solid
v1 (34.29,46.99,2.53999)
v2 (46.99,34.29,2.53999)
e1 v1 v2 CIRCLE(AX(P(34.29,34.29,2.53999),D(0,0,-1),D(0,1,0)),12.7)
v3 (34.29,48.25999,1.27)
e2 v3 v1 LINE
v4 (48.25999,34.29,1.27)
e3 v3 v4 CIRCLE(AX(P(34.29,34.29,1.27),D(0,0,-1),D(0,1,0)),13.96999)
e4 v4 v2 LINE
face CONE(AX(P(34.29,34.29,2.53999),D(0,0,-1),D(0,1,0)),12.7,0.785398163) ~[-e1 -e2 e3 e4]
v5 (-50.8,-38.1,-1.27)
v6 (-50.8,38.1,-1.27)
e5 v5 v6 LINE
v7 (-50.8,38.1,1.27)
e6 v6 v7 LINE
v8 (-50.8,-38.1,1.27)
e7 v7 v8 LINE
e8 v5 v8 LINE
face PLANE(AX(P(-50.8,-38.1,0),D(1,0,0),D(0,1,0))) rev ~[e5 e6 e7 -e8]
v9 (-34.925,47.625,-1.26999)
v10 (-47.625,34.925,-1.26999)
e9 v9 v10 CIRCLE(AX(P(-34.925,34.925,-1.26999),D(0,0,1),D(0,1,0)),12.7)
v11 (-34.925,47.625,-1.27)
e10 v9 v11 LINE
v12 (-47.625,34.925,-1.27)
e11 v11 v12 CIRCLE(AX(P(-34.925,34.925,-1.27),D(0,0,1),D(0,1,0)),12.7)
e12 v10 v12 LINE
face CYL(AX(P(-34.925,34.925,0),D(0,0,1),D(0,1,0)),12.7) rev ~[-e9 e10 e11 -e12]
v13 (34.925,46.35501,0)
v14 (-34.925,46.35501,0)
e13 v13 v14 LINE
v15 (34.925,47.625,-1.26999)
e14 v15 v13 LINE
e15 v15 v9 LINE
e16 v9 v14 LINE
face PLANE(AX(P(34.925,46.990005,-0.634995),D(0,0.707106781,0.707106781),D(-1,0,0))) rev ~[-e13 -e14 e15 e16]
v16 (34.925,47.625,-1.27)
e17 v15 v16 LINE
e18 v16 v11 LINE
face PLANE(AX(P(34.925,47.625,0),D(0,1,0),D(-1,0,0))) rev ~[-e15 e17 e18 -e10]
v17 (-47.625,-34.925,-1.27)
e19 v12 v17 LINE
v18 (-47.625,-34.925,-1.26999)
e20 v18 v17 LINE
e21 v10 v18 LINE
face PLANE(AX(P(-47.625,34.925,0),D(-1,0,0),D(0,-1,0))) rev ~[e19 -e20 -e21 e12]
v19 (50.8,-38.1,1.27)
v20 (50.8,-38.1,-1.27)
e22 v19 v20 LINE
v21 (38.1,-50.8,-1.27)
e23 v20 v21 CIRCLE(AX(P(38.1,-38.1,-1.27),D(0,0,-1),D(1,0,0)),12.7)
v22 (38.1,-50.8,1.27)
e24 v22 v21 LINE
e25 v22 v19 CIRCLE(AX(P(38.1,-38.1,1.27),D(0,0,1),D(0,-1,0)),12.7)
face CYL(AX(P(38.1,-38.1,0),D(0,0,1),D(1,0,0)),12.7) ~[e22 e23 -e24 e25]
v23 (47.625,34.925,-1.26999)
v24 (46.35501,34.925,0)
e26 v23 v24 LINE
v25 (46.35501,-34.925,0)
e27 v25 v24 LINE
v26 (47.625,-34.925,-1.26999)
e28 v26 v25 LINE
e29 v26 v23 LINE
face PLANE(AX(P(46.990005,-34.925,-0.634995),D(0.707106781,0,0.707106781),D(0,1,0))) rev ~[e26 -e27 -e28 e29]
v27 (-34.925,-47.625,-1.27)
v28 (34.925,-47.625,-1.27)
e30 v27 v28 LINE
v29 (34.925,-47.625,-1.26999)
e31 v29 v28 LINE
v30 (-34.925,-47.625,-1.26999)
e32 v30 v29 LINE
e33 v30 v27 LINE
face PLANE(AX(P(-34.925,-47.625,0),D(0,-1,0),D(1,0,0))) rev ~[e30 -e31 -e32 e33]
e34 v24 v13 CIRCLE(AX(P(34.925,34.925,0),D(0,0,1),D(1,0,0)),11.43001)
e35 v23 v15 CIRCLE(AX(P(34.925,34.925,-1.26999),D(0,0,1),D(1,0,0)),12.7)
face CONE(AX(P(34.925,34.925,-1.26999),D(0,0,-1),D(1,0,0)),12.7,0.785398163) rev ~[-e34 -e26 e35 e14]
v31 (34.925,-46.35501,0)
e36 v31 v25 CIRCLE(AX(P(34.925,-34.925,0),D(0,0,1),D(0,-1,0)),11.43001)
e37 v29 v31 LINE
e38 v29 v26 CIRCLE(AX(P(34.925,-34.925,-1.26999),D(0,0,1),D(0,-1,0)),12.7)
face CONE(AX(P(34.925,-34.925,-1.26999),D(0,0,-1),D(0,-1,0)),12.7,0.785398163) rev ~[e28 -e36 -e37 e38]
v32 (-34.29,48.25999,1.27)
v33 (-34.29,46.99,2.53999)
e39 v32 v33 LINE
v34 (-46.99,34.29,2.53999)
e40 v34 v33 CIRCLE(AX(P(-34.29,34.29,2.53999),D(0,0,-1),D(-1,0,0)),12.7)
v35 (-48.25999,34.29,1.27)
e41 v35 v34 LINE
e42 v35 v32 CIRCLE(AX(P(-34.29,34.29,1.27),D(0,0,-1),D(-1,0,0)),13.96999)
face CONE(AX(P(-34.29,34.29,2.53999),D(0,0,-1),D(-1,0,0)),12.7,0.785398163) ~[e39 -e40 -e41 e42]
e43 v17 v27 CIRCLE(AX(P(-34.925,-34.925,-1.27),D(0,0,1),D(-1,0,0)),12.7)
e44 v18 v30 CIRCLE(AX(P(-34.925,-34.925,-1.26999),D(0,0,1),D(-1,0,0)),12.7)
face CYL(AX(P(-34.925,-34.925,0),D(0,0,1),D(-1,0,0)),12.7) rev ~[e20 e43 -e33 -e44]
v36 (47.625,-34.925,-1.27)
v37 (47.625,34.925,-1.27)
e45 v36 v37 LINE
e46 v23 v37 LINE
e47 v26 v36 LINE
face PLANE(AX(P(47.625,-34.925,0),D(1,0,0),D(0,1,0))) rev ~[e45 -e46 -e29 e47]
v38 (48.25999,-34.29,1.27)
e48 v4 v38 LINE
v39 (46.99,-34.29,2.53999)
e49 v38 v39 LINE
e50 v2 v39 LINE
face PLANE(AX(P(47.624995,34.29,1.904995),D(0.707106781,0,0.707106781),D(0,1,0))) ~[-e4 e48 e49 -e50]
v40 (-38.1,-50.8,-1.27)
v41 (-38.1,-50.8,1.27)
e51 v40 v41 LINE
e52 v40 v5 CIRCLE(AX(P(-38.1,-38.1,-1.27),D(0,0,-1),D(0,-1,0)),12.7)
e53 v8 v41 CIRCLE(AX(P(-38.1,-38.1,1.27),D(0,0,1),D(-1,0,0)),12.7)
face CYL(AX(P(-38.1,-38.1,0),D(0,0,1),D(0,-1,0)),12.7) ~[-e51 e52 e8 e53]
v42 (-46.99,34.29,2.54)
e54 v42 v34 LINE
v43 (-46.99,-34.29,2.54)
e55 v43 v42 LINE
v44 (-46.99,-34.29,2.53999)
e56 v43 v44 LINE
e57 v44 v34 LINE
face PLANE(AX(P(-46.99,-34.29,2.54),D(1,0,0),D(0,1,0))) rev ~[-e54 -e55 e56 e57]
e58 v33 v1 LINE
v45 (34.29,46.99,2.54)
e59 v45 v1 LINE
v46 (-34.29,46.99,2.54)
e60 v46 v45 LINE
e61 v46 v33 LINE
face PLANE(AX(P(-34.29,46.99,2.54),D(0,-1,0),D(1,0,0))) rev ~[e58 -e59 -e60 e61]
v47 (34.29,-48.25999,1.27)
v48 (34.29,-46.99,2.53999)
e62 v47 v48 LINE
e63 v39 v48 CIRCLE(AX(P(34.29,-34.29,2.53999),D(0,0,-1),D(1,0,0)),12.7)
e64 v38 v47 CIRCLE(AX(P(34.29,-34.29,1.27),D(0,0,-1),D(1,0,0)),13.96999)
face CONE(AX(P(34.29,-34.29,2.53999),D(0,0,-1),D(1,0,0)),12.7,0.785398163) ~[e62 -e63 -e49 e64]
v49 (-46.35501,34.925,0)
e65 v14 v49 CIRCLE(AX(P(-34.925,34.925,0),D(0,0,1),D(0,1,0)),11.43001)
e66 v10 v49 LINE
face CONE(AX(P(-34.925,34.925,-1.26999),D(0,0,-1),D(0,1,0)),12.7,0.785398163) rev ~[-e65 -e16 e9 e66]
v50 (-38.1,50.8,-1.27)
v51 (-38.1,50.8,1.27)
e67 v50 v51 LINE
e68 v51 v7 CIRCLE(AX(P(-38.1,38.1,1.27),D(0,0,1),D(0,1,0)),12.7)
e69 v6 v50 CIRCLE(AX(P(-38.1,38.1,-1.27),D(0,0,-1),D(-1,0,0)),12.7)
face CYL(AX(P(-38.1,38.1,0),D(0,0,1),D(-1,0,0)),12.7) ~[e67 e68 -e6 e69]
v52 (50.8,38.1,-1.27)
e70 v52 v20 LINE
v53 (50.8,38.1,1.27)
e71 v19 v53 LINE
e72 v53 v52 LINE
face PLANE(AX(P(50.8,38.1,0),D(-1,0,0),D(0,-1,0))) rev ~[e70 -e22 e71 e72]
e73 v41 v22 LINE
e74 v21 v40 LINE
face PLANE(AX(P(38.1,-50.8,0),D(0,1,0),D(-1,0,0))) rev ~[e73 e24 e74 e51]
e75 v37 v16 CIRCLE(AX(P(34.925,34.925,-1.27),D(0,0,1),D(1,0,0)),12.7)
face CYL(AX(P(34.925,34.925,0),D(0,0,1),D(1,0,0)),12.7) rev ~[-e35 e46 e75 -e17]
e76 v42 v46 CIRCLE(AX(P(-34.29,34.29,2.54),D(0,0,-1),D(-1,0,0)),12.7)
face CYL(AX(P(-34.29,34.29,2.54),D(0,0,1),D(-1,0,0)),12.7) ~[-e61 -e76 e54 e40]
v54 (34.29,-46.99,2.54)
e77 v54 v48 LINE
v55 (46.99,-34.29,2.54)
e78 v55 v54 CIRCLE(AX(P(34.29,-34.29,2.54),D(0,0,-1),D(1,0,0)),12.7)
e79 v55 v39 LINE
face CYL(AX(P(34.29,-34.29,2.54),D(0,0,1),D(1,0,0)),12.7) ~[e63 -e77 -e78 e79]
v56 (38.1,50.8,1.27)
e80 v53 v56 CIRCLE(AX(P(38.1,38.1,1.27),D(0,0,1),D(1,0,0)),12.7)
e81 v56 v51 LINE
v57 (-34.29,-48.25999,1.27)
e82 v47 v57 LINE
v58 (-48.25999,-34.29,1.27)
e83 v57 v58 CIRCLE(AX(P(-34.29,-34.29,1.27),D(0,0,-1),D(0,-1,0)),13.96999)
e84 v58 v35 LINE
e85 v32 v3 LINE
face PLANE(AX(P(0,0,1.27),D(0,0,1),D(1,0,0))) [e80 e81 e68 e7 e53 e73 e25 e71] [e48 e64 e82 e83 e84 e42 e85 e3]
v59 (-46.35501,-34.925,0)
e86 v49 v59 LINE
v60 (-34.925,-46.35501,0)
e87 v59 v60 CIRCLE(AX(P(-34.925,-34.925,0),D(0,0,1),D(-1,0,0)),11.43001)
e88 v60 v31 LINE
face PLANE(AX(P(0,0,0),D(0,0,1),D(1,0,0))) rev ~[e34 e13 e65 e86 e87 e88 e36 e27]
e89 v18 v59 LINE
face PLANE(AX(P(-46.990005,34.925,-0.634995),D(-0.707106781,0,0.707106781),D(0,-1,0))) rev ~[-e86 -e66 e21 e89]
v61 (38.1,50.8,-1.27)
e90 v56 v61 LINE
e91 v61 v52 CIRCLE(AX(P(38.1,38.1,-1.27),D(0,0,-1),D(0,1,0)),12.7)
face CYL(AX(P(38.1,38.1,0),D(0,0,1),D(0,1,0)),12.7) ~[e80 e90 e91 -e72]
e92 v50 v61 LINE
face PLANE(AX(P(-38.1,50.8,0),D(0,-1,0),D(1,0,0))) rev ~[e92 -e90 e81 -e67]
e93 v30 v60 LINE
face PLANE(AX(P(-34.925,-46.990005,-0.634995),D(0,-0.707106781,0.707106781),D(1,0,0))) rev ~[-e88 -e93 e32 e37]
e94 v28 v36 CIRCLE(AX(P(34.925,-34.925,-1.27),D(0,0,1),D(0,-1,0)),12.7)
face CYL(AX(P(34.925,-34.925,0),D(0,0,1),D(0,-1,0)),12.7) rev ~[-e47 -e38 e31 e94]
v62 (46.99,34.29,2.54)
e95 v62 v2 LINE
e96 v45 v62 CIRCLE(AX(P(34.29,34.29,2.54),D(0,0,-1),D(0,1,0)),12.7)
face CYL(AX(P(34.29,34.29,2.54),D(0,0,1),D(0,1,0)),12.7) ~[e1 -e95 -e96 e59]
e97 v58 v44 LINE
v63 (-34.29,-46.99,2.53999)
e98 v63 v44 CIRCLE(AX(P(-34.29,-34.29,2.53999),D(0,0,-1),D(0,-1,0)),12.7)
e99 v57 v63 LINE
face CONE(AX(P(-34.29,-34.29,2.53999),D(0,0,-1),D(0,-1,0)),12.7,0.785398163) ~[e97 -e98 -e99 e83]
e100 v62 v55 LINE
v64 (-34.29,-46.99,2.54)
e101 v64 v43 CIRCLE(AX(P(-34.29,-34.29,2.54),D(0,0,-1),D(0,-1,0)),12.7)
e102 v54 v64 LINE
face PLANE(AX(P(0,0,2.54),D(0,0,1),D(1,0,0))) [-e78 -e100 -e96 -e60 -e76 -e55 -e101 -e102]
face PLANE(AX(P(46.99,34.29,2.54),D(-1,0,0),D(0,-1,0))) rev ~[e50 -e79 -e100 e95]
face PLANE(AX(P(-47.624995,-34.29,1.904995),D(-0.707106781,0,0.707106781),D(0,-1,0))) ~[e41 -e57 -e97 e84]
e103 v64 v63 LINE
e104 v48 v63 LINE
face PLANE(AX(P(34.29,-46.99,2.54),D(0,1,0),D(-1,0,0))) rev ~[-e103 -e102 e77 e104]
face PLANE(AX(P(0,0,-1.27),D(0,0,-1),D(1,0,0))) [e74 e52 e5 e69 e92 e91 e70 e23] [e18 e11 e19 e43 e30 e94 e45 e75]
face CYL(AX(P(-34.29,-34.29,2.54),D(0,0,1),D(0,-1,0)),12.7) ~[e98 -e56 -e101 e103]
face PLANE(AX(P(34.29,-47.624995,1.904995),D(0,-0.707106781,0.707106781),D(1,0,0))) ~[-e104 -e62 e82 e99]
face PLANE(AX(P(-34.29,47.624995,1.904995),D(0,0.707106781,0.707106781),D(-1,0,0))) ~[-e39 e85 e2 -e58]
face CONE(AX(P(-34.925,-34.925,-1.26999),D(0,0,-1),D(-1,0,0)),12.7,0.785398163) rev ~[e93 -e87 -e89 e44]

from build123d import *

# Parameters (mm, degrees)
F1_DEPTH = 2.54
F3_DEPTH = 1.27
F5_DEPTH = 1.27
F6_SIZE  = 1.26999
F7_SIZE  = 1.26999


# Not quite as in the source:
# - a fillet or chamfer is up to 0.001 mm smaller than in the source, because OpenCascade refuses the exact size


with BuildPart() as f1:
    # F0 (on Top) → F1 (new body)
    with BuildSketch(Plane.XY):
        with BuildLine():
            ThreePointArc((50.8, 38.1), (47.0802561211, 47.0802561211), (38.1, 50.8))
            Line((38.1, 50.8), (-38.1, 50.8))
            ThreePointArc((-38.1, 50.8), (-47.0802561211, 47.0802561211), (-50.8, 38.1))
            Line((-50.8, 38.1), (-50.8, -38.1))
            ThreePointArc((-50.8, -38.1), (-47.0802561211, -47.0802561211), (-38.1, -50.8))
            Line((-38.1, -50.8), (38.1, -50.8))
            ThreePointArc((38.1, -50.8), (47.0802561211, -47.0802561211), (50.8, -38.1))
            Line((50.8, -38.1), (50.8, 38.1))
        make_face()
    extrude(amount=F1_DEPTH)

    # F2 (on face) → F3 (join)
    with BuildSketch(Plane(origin=(0, 0, 0), x_dir=(1, 0, 0), z_dir=(0, 0, -1))):
        with BuildLine():
            Line((-38.1, -50.8), (38.1, -50.8))
            ThreePointArc((38.1, -50.8), (47.0802561211, -47.0802561211), (50.8, -38.1))
            Line((50.8, -38.1), (50.8, 38.1))
            ThreePointArc((50.8, 38.1), (47.0802561211, 47.0802561211), (38.1, 50.8))
            Line((38.1, 50.8), (-38.1, 50.8))
            ThreePointArc((-38.1, 50.8), (-47.0802561211, 47.0802561211), (-50.8, 38.1))
            Line((-50.8, 38.1), (-50.8, -38.1))
            ThreePointArc((-50.8, -38.1), (-47.0802561211, -47.0802561211), (-38.1, -50.8))
        make_face()
        with BuildLine():
            Line((-34.925, 47.625), (34.925, 47.625))
            ThreePointArc((34.925, 47.625), (43.9052561211, 43.9052561211), (47.625, 34.925))
            Line((47.625, 34.925), (47.625, -34.925))
            ThreePointArc((47.625, -34.925), (43.9052561211, -43.9052561211), (34.925, -47.625))
            Line((34.925, -47.625), (-34.925, -47.625))
            ThreePointArc((-34.925, -47.625), (-43.9052561211, -43.9052561211), (-47.625, -34.925))
            Line((-47.625, -34.925), (-47.625, 34.925))
            ThreePointArc((-47.625, 34.925), (-43.9052561211, 43.9052561211), (-34.925, 47.625))
        make_face(mode=Mode.SUBTRACT)
    extrude(amount=F3_DEPTH)

    # F4 (on face) → F5 (cut)
    with BuildSketch(Plane.XY.offset(2.54)):
        with BuildLine():
            Line((50.8, -38.1), (50.8, 38.1))
            ThreePointArc((50.8, 38.1), (47.0802561211, 47.0802561211), (38.1, 50.8))
            Line((38.1, 50.8), (-38.1, 50.8))
            ThreePointArc((-38.1, 50.8), (-47.0802561211, 47.0802561211), (-50.8, 38.1))
            Line((-50.8, 38.1), (-50.8, -38.1))
            ThreePointArc((-50.8, -38.1), (-47.0802561211, -47.0802561211), (-38.1, -50.8))
            Line((-38.1, -50.8), (38.1, -50.8))
            ThreePointArc((38.1, -50.8), (47.0802561211, -47.0802561211), (50.8, -38.1))
        make_face()
        with BuildLine():
            ThreePointArc((46.99, -34.29), (43.2702561211, -43.2702561211), (34.29, -46.99))
            Line((34.29, -46.99), (-34.29, -46.99))
            ThreePointArc((-34.29, -46.99), (-43.2702561211, -43.2702561211), (-46.99, -34.29))
            Line((-46.99, -34.29), (-46.99, 34.29))
            ThreePointArc((-46.99, 34.29), (-43.2702561211, 43.2702561211), (-34.29, 46.99))
            Line((-34.29, 46.99), (34.29, 46.99))
            ThreePointArc((34.29, 46.99), (43.2702561211, 43.2702561211), (46.99, 34.29))
            Line((46.99, 34.29), (46.99, -34.29))
        make_face(mode=Mode.SUBTRACT)
    extrude(amount=-F5_DEPTH, mode=Mode.SUBTRACT)

    # F6 (size 1.27 in the source; OpenCascade refuses exactly that, so slightly less here)
    f6_edges = [f1.edges().sort_by_distance(p)[0] for p in [
        (0, 46.99, 1.27),
        (-43.270256, 43.270256, 1.27),
        (-46.99, 0, 1.27),
        (-43.270256, -43.270256, 1.27),
    ]]
    chamfer(f6_edges, length=F6_SIZE)

    # F7 (size 1.27 in the source; OpenCascade refuses exactly that, so slightly less here)
    f7_edges = [f1.edges().sort_by_distance(p)[0] for p in [
        (-43.905256, -43.905256, 0),
        (-47.625, 0, 0),
        (-43.905256, 43.905256, 0),
        (0, 47.625, 0),
        (43.905256, 43.905256, 0),
        (47.625, 0, 0),
        (43.905256, -43.905256, 0),
        (0, -47.625, 0),
    ]]
    chamfer(f7_edges, length=F7_SIZE)


solid = f1.part
